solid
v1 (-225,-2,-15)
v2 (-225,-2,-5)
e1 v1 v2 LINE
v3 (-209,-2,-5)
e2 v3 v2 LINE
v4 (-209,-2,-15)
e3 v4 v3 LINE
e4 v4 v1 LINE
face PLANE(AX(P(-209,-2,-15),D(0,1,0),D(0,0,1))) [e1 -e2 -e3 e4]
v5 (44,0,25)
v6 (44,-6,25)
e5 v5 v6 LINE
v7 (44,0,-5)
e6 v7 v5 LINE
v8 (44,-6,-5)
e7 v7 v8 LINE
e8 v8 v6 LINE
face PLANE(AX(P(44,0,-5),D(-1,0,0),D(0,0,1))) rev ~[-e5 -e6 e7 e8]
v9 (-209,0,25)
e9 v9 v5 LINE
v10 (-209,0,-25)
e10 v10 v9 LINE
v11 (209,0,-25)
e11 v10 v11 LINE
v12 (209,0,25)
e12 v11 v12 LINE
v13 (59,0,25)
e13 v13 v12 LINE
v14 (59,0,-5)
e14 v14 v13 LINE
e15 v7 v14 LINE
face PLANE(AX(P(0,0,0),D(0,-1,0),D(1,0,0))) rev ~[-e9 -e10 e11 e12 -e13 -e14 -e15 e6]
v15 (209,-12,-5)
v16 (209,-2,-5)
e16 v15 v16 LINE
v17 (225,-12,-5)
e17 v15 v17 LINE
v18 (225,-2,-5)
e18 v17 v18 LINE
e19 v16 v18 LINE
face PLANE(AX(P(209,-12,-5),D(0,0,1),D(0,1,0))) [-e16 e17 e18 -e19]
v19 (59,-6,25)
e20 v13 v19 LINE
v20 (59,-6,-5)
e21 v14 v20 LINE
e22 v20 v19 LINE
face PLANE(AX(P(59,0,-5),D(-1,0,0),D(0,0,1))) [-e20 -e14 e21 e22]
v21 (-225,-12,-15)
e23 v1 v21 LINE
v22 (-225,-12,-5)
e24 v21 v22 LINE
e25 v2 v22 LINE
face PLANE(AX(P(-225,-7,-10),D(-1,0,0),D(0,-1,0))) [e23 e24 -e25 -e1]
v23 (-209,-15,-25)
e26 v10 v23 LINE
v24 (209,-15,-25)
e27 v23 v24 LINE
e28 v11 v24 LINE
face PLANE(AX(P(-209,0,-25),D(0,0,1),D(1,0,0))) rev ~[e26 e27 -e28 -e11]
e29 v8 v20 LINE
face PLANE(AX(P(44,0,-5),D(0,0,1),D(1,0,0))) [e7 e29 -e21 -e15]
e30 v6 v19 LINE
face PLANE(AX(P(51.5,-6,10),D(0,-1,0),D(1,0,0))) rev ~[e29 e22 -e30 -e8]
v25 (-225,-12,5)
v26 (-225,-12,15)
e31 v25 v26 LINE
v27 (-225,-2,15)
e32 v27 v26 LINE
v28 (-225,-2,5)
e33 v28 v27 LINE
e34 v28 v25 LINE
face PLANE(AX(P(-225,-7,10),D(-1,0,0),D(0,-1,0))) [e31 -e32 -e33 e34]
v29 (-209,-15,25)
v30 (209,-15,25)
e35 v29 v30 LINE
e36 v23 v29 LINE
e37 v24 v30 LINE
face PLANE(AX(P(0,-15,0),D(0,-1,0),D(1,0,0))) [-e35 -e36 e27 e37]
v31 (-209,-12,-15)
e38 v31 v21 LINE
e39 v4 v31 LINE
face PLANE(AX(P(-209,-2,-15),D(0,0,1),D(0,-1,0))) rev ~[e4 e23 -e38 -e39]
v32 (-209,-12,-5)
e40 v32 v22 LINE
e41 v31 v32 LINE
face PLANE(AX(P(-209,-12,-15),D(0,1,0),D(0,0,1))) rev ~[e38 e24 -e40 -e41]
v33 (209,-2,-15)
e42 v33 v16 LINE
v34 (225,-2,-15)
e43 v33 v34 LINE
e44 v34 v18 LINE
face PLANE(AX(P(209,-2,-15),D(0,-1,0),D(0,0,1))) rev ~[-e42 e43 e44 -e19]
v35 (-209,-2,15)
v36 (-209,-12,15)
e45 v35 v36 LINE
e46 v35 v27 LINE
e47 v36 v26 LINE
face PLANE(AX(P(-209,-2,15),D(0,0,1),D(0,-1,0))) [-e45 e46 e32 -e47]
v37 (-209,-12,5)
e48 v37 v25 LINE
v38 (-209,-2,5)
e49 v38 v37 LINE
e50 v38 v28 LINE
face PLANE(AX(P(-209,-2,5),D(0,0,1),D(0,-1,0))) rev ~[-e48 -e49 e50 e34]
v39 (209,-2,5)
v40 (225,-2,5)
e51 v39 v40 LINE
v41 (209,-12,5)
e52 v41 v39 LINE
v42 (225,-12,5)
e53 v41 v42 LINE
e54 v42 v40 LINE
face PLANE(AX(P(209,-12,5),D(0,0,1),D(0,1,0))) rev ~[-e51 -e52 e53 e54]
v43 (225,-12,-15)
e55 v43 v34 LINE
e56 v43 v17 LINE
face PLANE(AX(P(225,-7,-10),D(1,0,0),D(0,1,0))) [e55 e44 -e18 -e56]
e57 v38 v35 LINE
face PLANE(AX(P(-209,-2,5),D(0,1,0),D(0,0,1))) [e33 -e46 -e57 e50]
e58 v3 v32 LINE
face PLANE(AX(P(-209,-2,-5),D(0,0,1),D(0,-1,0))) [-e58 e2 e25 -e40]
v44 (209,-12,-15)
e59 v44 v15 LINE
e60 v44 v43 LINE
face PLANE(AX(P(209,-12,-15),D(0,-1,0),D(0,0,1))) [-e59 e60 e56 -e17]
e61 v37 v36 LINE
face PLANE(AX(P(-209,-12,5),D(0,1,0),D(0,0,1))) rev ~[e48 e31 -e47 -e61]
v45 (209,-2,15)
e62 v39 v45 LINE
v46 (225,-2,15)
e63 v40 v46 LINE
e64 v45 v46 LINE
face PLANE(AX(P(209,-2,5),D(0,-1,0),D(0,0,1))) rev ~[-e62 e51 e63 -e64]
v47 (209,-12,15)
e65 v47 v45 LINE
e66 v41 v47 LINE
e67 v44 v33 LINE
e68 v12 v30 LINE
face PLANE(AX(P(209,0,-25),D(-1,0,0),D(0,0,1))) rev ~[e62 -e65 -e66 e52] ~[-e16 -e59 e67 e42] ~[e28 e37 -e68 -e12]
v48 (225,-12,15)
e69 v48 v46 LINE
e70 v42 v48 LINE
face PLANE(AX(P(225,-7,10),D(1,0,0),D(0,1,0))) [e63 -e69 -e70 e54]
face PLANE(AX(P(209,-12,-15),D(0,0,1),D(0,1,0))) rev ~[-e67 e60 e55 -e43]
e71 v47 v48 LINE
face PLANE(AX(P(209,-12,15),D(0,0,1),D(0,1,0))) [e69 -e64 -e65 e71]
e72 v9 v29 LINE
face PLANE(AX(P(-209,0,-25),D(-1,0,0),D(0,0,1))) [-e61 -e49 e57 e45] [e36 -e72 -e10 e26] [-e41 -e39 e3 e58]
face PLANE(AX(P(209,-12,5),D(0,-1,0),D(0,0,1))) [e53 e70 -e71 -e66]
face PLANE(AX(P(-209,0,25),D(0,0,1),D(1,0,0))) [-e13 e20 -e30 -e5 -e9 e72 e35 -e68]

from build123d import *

# Parameters (mm, degrees)
F0_W     = 418
F0_H     = 50
F1_DEPTH = 15
F2_W     = 10
F2_H     = 10
F3_DEPTH = 16
F4_W     = 10
F4_H     = 10
F5_DEPTH = 16
F6_W     = 15
F6_H     = 30
F7_DEPTH = 6


# Not quite as in the source:
# - a feature names something its author has since deleted; it is built from what else it names


with BuildPart() as f1:
    # F0 (on Front) → F1 (new body)
    with BuildSketch(Plane.XZ):
        Rectangle(F0_W, F0_H)
    extrude(amount=F1_DEPTH)

    # F2 (on face) → F3 (join)
    with BuildSketch(Plane.YZ.offset(209)):
        with Locations((-7, 10)):
            Rectangle(F2_W, F2_H)
        with Locations((-7, -10)):
            Rectangle(F2_W, F2_H)
    extrude(amount=F3_DEPTH)

    # F4 (on face) → F5 (join)
    with BuildSketch(Plane(origin=(-209, 0, 0), x_dir=(0, -1, 0), z_dir=(-1, 0, 0))):
        with Locations((7, 10)):
            Rectangle(F4_W, F4_H)
        with Locations((7, -10)):
            Rectangle(F4_W, F4_H)
    extrude(amount=F5_DEPTH)

    # F6 (on face) → F7 (cut)
    with BuildSketch(Plane.XZ):
        with Locations((51.5, 10)):
            Rectangle(F6_W, F6_H)
    extrude(amount=F7_DEPTH, mode=Mode.SUBTRACT)


solid = f1.part
